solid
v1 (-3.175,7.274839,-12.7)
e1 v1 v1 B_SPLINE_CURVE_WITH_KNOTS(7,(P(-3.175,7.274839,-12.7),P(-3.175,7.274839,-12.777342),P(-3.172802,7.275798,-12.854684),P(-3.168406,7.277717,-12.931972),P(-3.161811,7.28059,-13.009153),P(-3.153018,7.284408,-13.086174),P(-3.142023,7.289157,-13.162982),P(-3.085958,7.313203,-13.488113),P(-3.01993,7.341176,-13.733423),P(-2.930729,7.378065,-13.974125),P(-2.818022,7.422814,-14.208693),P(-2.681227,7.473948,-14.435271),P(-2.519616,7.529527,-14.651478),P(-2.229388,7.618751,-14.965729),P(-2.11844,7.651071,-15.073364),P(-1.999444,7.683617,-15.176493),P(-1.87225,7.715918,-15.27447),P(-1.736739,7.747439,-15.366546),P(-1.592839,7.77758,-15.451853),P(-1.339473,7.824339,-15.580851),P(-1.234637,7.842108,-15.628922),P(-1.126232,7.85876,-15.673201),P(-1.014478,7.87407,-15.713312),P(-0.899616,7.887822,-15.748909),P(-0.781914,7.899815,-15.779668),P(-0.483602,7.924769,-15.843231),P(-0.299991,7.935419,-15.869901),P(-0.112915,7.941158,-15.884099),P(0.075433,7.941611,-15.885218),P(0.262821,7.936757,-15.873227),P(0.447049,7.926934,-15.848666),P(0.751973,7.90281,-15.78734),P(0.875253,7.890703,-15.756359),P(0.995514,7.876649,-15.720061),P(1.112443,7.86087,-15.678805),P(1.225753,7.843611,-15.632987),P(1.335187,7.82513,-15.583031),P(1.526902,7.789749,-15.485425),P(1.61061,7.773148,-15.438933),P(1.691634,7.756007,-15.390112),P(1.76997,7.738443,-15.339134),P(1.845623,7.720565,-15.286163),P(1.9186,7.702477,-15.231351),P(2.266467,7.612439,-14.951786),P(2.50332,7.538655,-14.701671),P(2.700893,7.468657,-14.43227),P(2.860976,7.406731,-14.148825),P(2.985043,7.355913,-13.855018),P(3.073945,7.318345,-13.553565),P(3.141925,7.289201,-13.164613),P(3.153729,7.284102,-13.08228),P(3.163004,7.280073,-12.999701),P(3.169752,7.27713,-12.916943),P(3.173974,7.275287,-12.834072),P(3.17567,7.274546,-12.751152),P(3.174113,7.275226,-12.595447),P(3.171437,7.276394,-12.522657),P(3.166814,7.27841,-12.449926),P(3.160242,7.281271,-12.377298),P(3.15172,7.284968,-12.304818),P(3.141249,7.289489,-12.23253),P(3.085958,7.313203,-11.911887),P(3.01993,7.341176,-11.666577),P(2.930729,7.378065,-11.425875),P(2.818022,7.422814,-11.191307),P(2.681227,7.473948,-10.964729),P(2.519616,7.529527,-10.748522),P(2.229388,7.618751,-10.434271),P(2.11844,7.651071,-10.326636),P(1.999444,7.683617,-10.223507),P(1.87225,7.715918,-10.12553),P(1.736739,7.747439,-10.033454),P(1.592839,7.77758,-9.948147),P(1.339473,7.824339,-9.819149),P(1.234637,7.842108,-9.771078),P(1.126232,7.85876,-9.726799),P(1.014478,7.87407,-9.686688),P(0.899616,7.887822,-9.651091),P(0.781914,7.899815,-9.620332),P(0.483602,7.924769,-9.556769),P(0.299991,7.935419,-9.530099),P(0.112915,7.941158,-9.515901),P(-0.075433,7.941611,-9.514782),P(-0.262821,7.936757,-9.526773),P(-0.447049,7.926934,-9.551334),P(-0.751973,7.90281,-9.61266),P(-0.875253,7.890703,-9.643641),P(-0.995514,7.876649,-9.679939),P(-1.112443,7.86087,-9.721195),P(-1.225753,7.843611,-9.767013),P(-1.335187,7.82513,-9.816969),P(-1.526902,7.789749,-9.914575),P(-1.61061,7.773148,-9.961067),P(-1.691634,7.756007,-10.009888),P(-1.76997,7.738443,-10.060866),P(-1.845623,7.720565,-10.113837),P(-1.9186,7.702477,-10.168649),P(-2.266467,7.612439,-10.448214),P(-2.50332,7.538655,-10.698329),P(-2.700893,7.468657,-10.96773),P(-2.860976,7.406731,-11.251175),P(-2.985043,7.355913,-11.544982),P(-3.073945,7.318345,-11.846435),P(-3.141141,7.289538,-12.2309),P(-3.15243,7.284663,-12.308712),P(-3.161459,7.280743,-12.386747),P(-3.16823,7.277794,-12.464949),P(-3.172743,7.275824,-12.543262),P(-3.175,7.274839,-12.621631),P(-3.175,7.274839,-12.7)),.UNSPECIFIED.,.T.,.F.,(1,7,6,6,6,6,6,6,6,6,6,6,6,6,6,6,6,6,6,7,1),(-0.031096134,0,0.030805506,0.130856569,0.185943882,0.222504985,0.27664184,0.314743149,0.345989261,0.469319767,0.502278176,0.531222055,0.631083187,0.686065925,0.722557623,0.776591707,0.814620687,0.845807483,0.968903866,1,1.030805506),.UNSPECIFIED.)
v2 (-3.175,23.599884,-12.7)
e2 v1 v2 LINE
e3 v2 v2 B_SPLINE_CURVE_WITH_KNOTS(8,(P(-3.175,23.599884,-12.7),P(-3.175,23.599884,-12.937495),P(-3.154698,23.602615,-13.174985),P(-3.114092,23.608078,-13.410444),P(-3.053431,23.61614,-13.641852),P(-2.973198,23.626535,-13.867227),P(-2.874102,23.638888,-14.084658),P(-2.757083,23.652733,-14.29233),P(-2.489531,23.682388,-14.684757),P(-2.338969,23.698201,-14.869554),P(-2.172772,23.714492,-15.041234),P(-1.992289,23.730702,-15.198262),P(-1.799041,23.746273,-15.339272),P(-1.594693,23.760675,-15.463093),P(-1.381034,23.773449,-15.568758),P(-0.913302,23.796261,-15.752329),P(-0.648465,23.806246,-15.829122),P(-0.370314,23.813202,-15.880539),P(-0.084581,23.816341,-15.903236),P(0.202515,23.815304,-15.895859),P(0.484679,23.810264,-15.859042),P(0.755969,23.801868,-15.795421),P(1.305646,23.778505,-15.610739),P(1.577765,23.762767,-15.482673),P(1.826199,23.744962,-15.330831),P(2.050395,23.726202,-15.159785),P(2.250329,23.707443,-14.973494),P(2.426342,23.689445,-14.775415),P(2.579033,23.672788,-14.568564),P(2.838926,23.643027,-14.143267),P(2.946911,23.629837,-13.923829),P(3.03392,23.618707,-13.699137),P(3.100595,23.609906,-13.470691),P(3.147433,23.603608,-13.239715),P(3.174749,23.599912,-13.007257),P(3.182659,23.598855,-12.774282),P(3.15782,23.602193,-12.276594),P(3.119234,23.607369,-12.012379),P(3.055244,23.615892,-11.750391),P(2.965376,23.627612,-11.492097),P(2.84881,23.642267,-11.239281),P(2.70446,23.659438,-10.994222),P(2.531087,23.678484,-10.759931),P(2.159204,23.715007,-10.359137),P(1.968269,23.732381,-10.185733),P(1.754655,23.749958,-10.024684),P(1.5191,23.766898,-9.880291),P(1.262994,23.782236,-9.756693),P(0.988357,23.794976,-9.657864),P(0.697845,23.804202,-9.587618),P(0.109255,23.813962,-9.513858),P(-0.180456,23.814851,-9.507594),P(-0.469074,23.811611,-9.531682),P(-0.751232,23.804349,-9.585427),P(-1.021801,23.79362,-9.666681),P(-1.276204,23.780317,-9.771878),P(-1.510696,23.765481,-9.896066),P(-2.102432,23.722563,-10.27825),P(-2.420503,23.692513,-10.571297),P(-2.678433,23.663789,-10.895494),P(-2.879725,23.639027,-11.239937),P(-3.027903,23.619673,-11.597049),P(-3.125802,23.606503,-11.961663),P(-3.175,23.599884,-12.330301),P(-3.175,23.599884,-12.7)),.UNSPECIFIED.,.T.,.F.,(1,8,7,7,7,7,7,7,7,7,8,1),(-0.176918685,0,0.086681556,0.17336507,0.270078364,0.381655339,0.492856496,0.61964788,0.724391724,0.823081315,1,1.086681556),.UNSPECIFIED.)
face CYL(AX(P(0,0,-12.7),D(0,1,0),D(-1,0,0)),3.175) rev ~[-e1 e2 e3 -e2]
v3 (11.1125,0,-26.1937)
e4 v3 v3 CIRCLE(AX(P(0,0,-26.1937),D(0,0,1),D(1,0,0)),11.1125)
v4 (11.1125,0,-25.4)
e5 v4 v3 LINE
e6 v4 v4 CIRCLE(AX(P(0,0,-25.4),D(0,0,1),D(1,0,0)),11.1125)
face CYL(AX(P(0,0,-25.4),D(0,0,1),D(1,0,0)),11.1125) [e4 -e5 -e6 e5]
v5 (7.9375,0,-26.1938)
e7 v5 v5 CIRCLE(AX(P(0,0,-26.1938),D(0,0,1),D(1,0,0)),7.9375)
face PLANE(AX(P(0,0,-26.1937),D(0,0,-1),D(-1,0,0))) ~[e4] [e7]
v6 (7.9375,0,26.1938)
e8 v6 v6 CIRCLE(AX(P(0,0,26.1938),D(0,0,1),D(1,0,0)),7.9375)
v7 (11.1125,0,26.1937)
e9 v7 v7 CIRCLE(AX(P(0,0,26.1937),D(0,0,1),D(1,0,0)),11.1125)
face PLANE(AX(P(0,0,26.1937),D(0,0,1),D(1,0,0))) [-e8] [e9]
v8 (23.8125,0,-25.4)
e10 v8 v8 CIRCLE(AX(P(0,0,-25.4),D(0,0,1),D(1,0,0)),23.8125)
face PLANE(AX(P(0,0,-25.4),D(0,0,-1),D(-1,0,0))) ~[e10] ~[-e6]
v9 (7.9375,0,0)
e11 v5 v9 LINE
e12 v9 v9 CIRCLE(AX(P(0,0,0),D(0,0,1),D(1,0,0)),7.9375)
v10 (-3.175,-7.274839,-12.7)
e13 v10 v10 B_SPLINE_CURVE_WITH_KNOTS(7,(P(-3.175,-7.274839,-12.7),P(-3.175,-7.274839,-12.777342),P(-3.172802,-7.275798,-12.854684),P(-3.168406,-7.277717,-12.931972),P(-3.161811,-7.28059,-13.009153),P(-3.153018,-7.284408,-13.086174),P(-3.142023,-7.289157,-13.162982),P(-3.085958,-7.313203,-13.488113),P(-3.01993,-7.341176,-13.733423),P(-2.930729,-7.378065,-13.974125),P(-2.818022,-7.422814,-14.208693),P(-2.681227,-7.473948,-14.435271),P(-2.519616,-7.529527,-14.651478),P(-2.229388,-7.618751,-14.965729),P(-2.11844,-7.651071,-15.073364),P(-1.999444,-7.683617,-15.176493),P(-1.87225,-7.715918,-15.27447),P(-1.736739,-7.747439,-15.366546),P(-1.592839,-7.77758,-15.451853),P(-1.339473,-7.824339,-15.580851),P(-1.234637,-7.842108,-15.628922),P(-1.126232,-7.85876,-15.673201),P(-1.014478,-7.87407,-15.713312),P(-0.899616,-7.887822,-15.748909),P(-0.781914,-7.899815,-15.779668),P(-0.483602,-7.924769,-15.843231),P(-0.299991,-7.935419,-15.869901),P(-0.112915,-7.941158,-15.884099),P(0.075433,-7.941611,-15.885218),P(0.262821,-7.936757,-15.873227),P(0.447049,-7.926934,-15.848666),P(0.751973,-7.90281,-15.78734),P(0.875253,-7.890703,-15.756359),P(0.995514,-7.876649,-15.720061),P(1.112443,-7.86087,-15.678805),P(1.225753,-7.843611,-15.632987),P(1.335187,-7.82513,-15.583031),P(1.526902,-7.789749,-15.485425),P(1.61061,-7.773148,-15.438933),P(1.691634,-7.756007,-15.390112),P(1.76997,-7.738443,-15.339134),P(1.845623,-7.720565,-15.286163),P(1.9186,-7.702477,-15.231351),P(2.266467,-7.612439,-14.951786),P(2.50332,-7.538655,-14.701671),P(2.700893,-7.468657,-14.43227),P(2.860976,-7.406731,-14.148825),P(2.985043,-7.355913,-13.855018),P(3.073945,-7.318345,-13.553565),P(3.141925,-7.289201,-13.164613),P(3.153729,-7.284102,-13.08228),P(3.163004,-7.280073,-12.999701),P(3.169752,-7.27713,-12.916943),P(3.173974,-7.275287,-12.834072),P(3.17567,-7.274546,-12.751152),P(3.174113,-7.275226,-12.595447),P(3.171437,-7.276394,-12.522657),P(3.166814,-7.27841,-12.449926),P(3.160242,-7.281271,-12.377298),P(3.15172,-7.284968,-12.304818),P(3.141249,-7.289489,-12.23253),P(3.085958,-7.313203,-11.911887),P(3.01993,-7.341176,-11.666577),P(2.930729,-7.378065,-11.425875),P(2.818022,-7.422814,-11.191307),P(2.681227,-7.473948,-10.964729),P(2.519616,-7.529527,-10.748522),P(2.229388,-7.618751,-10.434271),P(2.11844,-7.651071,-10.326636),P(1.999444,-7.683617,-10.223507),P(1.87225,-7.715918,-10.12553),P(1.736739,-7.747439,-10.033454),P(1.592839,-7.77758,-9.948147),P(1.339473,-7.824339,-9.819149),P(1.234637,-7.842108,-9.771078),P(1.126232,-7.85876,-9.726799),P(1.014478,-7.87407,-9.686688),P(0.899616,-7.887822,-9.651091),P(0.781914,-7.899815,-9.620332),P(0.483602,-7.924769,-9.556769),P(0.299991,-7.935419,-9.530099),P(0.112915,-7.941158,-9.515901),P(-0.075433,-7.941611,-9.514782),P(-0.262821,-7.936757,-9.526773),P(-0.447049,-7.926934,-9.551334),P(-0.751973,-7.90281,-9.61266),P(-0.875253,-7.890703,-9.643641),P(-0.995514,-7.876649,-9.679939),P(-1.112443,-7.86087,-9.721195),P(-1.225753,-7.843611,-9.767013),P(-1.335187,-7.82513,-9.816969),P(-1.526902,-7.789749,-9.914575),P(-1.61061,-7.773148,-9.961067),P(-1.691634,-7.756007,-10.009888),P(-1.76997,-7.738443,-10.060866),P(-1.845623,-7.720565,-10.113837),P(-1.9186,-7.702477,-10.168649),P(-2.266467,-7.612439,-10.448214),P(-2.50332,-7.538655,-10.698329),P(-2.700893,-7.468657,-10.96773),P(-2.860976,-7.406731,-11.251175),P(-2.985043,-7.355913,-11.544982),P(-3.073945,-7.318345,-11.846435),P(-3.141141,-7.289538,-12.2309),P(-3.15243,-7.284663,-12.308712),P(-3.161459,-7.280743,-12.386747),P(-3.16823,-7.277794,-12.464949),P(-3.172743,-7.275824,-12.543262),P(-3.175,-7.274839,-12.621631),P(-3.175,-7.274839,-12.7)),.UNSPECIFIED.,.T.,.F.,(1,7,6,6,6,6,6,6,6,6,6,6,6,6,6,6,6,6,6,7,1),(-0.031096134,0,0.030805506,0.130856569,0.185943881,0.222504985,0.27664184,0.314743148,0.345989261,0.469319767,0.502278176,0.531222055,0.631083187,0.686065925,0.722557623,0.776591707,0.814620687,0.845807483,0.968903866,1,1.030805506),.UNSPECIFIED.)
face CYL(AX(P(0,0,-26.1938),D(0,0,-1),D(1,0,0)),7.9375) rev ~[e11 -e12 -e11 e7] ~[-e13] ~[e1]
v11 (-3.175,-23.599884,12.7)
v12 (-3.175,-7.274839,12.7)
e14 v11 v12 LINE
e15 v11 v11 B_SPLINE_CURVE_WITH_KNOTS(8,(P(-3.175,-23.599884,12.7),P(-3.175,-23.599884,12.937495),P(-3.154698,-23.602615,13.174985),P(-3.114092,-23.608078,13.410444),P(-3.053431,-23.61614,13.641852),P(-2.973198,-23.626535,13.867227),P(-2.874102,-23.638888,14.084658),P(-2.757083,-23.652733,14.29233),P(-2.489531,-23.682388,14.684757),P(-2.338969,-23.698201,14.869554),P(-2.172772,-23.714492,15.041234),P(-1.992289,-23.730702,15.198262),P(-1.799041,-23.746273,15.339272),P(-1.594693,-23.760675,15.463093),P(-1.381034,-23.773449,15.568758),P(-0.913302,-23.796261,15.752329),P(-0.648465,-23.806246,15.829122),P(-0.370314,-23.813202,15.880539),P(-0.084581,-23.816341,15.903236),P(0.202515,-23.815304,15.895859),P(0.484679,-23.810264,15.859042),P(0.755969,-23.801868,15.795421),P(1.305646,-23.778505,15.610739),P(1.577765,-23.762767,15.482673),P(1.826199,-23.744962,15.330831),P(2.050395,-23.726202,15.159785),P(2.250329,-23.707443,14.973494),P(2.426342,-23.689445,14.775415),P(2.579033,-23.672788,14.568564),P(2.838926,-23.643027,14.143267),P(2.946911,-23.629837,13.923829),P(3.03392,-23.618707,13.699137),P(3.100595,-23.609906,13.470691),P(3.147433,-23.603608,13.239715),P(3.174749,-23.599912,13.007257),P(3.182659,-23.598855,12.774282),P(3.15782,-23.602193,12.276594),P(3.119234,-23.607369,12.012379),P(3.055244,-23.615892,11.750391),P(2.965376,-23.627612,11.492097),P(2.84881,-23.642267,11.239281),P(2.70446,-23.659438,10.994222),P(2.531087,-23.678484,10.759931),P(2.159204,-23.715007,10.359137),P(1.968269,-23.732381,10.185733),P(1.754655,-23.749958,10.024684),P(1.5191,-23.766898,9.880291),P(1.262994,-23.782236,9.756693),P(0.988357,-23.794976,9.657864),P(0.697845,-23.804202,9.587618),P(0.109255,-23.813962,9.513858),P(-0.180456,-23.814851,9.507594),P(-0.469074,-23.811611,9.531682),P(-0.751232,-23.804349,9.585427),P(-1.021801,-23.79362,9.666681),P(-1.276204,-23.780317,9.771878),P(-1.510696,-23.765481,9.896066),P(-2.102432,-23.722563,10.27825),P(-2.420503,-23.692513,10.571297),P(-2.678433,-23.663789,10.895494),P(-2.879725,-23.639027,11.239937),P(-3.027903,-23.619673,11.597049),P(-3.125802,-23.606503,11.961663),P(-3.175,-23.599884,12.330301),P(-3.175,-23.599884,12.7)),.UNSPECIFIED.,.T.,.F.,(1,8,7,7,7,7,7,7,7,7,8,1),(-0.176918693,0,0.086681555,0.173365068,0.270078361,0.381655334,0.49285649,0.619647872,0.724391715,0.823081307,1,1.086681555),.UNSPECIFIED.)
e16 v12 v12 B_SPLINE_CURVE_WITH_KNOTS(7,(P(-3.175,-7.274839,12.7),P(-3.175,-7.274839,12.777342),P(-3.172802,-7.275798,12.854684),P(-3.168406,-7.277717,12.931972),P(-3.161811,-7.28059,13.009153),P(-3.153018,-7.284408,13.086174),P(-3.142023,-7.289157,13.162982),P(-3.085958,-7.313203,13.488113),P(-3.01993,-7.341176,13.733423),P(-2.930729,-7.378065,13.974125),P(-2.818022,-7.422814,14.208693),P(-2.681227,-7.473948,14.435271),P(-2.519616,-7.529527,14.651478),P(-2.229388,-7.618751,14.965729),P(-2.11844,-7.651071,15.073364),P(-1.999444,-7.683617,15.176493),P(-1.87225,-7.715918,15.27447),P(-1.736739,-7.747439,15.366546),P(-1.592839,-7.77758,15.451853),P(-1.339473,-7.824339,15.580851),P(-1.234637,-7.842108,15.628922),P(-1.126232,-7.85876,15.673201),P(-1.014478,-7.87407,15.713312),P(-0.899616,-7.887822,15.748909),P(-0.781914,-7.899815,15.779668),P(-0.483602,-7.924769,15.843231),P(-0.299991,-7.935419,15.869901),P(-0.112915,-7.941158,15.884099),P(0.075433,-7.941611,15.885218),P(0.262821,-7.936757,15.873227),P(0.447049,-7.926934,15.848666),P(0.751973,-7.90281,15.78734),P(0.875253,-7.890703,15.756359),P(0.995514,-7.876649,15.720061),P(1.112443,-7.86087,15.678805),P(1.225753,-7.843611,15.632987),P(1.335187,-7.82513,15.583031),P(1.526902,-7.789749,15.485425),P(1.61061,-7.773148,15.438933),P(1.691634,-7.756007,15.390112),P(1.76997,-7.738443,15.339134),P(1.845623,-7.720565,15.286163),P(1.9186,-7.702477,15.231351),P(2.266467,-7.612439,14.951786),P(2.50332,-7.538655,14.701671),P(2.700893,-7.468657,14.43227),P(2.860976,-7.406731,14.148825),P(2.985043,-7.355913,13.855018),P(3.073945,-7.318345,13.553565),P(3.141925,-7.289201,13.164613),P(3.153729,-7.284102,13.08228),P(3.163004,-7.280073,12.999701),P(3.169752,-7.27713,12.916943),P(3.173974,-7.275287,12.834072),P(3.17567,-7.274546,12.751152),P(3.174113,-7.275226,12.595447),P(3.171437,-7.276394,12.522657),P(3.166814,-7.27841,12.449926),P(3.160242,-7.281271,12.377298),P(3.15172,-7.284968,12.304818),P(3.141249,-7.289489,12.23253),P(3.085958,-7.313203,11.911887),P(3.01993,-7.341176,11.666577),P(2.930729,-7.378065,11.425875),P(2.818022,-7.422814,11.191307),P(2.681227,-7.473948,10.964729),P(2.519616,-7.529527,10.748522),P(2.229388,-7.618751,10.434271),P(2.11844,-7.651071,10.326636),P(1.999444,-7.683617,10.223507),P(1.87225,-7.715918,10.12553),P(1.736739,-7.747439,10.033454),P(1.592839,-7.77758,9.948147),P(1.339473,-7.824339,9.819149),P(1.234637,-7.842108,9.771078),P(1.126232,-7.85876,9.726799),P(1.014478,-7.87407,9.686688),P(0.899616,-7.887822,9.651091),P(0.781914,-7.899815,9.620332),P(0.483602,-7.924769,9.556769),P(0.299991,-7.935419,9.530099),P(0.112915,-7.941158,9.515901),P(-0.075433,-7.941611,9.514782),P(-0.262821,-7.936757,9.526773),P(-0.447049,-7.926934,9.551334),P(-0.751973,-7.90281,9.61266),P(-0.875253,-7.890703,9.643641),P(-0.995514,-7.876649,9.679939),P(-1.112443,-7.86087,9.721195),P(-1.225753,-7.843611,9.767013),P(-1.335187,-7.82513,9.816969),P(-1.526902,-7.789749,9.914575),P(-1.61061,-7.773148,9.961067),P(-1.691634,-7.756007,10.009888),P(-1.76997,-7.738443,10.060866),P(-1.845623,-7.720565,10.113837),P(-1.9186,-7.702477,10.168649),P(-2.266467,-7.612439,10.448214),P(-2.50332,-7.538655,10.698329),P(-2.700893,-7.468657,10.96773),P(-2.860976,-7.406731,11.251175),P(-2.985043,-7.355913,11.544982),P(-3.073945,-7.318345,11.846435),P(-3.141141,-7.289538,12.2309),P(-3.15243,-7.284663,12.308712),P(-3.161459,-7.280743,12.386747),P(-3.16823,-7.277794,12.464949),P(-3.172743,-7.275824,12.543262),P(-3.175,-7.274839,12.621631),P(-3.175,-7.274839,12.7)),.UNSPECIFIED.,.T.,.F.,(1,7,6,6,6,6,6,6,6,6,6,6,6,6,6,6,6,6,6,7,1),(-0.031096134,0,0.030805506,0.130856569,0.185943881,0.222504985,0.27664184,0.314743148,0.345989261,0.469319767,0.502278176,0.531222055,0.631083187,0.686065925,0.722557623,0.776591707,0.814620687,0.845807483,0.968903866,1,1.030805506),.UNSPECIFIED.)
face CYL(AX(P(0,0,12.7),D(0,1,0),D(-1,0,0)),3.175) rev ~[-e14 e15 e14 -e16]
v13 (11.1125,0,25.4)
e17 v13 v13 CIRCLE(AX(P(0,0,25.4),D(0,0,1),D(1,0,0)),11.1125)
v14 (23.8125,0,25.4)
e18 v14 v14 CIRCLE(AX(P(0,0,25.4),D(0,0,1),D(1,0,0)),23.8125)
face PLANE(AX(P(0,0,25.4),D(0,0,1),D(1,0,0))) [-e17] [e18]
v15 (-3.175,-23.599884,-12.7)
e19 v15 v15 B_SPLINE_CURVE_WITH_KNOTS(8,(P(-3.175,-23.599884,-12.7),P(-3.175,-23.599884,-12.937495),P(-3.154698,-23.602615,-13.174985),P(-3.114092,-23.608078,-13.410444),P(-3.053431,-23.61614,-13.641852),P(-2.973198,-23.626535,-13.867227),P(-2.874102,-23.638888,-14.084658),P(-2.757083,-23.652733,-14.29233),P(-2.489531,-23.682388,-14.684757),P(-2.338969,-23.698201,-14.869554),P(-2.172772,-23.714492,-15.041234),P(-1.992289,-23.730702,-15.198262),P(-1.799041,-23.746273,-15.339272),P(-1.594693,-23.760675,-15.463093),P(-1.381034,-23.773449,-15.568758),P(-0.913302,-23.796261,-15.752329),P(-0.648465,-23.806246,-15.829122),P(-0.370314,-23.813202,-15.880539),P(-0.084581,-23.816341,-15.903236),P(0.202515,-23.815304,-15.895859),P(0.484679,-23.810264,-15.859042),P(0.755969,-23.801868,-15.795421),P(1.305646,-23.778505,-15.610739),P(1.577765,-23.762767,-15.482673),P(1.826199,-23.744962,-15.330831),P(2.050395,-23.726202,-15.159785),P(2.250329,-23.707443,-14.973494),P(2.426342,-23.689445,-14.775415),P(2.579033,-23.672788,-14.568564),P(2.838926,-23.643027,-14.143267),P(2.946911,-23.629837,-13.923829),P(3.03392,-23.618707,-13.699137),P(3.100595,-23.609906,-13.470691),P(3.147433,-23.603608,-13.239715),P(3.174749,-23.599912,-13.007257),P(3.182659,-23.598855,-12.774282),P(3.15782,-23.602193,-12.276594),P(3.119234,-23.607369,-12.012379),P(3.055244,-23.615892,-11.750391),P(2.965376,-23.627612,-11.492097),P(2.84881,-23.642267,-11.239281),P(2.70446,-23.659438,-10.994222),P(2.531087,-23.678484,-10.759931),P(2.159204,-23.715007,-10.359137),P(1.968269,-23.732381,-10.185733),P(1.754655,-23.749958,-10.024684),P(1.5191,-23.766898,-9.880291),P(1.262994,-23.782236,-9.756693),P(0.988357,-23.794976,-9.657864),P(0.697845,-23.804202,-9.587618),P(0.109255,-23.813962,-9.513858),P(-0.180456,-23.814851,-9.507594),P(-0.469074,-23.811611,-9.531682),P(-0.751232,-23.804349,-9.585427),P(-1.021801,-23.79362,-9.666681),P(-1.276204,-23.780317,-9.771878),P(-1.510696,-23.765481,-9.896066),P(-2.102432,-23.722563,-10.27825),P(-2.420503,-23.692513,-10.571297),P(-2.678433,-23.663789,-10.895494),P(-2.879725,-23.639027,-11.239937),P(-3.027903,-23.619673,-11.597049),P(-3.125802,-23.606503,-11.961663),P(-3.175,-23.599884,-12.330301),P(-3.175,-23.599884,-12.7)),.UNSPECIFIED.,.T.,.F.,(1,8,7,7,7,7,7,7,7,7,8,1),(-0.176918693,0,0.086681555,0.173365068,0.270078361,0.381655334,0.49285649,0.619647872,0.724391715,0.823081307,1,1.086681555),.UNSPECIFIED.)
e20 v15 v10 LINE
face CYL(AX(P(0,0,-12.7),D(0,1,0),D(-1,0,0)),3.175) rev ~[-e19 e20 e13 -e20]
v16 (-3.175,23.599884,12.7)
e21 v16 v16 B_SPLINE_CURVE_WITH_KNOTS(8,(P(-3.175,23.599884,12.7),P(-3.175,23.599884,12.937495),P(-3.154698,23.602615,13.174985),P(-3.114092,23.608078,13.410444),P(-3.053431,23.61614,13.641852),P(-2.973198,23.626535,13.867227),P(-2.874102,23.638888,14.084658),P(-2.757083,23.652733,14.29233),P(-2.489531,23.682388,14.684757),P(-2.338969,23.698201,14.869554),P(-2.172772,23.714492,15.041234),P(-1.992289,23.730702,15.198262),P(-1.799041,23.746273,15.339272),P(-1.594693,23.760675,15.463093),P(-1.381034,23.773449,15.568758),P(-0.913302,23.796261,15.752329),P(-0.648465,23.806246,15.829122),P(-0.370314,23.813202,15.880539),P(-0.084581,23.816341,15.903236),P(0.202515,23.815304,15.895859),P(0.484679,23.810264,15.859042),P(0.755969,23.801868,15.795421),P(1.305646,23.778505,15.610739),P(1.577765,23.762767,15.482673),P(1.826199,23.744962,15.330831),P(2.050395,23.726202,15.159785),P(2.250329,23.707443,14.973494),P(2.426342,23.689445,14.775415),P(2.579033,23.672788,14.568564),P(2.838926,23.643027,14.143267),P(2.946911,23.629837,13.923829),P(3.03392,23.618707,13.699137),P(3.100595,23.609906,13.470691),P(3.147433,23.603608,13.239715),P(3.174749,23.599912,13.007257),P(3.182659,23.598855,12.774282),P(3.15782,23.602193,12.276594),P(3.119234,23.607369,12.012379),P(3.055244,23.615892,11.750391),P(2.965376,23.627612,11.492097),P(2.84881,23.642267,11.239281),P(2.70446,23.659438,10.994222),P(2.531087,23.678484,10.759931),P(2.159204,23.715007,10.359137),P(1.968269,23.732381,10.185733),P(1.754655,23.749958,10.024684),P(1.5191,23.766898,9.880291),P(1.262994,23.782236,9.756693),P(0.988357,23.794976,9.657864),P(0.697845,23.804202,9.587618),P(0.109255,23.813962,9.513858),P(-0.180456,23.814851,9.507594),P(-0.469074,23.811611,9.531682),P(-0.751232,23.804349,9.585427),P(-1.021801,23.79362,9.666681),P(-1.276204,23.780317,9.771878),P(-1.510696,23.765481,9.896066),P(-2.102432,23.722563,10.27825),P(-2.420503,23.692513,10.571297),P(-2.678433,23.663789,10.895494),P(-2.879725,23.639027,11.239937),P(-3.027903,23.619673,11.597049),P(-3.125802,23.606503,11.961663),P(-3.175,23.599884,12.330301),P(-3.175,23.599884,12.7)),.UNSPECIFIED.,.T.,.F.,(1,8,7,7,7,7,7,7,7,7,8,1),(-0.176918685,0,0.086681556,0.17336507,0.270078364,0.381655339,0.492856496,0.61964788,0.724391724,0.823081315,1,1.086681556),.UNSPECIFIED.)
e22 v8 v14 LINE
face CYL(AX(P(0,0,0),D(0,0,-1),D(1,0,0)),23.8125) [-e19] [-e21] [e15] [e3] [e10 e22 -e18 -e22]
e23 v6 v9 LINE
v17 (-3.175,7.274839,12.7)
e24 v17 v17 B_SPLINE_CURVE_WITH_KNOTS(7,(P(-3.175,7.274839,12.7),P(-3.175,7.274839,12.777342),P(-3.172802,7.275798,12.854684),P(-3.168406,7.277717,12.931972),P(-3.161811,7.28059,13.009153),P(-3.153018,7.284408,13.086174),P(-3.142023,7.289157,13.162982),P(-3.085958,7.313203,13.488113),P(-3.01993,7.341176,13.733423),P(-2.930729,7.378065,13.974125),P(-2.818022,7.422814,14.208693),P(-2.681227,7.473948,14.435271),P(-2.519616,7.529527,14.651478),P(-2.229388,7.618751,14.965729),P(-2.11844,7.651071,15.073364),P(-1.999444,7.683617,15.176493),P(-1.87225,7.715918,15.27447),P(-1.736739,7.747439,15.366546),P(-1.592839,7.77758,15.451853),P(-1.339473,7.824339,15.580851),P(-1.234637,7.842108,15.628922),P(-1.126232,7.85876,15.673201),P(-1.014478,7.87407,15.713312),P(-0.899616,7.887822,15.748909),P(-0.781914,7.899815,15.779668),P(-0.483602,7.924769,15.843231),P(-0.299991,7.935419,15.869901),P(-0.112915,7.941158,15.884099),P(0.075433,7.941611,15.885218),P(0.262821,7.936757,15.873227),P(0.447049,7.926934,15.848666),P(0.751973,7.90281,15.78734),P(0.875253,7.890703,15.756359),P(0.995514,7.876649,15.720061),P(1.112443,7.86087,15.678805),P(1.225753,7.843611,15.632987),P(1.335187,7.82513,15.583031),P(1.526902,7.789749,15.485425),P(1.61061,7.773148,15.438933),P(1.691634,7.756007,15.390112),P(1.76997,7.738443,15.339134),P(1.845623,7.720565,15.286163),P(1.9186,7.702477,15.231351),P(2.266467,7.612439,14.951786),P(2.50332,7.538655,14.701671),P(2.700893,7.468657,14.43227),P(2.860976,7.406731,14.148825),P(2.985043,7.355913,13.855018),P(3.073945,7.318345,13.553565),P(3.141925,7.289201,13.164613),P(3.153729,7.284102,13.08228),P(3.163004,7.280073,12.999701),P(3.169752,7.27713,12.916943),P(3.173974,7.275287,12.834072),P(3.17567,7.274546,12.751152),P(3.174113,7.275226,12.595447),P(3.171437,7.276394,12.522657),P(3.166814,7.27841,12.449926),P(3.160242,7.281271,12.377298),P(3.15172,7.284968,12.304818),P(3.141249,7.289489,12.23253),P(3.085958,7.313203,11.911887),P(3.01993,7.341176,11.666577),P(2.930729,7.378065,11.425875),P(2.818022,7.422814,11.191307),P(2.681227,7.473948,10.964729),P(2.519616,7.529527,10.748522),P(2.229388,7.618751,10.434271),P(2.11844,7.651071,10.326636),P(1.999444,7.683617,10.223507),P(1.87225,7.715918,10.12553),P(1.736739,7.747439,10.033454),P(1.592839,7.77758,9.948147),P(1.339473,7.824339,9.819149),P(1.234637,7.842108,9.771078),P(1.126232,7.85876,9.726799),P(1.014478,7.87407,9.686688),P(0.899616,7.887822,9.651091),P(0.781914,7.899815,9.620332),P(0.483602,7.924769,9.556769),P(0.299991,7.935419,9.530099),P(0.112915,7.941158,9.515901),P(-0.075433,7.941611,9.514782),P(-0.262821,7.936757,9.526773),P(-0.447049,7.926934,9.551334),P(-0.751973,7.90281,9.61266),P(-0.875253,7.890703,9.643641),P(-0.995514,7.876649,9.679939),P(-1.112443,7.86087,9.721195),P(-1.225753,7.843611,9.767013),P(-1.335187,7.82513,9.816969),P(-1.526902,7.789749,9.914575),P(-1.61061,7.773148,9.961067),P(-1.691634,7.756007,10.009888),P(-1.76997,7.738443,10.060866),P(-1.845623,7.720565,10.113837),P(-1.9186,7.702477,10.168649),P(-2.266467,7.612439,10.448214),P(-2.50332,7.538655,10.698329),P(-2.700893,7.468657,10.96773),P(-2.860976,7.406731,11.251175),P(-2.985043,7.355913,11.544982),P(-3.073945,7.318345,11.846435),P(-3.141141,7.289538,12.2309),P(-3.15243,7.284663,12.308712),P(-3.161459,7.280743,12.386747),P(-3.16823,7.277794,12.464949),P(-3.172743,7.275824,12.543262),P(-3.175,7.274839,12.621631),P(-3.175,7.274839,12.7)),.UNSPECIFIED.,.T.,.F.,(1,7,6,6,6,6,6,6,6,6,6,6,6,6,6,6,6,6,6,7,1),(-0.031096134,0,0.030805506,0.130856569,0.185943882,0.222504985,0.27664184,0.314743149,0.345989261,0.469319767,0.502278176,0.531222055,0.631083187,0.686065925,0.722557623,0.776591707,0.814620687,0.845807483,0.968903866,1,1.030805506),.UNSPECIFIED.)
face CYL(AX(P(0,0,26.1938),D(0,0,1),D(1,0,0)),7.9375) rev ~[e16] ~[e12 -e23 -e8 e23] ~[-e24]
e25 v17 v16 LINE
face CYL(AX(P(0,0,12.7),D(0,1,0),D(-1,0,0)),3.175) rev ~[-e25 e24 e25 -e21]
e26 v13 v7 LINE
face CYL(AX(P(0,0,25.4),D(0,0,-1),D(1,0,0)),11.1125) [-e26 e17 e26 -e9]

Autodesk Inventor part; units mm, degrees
ref_plane "YZ Plane" through (0, 0, 0) normal (1, 0, 0) x (0, 1, 0)
ref_plane "XZ Plane" through (0, 0, 0) normal (0, 1, 0) x (-1, 0, 0)
ref_plane "XY Plane" through (0, 0, 0) normal (0, 0, 1) x (1, 0, 0)
sketch "Sketch1" plane through (0, 0, 0) normal (0, 0, 1) x (1, 0, 0)
  circle A0 centre (0, 0) radius 23.8125
  dimension "d0" = 47.625
extrude "Extrusion1" add sketch "Sketch1" along normal blind 25.4
sketch "Sketch2" plane through (0, 0, 25.4) normal (0, 0, 1) x (1, 0, 0)
  circle A0 centre (0, 0) radius 23.8125 projected
  circle A1 centre (0, 0) radius 11.1125
  dimension "d3" = 22.225
extrude "Extrusion2" add sketch "Sketch2" along normal blind 0.7937 contours A1
sketch "Sketch3" plane through (0, 0, 26.1938) normal (0, 0, 1) x (1, 0, 0)
  circle A0 centre (0, 0) radius 11.1125 projected
  circle A1 centre (0, 0) radius 7.9375
  dimension "d6" = 15.875
extrude "Extrusion3" cut sketch "Sketch3" against normal through all contours A1
sketch "Sketch4" plane through (0, 0, 0) normal (0, 1, 0) x (-1, 0, 0)
  line L0 (7.9375, 0) -> (-7.9375, 0) projected
  line L1 (-7.9375, 26.1938) -> (7.9375, 26.1938) projected
  circle A0 centre (0, 12.7) radius 3.175
  line L2 (0, 0) -> (0, 26.1938)
  line L3 (23.8125, 25.4) -> (-23.8125, 25.4) projected
  dimension "d9" = 6.35
  dimension "d10" = 12.7
extrude "Extrusion4" cut sketch "Sketch4" along normal through all both and the other way through all
mirror "Mirror1" about plane through (0, 0, 0) normal (0, 0, -1)
properties part number "Winch Body"
